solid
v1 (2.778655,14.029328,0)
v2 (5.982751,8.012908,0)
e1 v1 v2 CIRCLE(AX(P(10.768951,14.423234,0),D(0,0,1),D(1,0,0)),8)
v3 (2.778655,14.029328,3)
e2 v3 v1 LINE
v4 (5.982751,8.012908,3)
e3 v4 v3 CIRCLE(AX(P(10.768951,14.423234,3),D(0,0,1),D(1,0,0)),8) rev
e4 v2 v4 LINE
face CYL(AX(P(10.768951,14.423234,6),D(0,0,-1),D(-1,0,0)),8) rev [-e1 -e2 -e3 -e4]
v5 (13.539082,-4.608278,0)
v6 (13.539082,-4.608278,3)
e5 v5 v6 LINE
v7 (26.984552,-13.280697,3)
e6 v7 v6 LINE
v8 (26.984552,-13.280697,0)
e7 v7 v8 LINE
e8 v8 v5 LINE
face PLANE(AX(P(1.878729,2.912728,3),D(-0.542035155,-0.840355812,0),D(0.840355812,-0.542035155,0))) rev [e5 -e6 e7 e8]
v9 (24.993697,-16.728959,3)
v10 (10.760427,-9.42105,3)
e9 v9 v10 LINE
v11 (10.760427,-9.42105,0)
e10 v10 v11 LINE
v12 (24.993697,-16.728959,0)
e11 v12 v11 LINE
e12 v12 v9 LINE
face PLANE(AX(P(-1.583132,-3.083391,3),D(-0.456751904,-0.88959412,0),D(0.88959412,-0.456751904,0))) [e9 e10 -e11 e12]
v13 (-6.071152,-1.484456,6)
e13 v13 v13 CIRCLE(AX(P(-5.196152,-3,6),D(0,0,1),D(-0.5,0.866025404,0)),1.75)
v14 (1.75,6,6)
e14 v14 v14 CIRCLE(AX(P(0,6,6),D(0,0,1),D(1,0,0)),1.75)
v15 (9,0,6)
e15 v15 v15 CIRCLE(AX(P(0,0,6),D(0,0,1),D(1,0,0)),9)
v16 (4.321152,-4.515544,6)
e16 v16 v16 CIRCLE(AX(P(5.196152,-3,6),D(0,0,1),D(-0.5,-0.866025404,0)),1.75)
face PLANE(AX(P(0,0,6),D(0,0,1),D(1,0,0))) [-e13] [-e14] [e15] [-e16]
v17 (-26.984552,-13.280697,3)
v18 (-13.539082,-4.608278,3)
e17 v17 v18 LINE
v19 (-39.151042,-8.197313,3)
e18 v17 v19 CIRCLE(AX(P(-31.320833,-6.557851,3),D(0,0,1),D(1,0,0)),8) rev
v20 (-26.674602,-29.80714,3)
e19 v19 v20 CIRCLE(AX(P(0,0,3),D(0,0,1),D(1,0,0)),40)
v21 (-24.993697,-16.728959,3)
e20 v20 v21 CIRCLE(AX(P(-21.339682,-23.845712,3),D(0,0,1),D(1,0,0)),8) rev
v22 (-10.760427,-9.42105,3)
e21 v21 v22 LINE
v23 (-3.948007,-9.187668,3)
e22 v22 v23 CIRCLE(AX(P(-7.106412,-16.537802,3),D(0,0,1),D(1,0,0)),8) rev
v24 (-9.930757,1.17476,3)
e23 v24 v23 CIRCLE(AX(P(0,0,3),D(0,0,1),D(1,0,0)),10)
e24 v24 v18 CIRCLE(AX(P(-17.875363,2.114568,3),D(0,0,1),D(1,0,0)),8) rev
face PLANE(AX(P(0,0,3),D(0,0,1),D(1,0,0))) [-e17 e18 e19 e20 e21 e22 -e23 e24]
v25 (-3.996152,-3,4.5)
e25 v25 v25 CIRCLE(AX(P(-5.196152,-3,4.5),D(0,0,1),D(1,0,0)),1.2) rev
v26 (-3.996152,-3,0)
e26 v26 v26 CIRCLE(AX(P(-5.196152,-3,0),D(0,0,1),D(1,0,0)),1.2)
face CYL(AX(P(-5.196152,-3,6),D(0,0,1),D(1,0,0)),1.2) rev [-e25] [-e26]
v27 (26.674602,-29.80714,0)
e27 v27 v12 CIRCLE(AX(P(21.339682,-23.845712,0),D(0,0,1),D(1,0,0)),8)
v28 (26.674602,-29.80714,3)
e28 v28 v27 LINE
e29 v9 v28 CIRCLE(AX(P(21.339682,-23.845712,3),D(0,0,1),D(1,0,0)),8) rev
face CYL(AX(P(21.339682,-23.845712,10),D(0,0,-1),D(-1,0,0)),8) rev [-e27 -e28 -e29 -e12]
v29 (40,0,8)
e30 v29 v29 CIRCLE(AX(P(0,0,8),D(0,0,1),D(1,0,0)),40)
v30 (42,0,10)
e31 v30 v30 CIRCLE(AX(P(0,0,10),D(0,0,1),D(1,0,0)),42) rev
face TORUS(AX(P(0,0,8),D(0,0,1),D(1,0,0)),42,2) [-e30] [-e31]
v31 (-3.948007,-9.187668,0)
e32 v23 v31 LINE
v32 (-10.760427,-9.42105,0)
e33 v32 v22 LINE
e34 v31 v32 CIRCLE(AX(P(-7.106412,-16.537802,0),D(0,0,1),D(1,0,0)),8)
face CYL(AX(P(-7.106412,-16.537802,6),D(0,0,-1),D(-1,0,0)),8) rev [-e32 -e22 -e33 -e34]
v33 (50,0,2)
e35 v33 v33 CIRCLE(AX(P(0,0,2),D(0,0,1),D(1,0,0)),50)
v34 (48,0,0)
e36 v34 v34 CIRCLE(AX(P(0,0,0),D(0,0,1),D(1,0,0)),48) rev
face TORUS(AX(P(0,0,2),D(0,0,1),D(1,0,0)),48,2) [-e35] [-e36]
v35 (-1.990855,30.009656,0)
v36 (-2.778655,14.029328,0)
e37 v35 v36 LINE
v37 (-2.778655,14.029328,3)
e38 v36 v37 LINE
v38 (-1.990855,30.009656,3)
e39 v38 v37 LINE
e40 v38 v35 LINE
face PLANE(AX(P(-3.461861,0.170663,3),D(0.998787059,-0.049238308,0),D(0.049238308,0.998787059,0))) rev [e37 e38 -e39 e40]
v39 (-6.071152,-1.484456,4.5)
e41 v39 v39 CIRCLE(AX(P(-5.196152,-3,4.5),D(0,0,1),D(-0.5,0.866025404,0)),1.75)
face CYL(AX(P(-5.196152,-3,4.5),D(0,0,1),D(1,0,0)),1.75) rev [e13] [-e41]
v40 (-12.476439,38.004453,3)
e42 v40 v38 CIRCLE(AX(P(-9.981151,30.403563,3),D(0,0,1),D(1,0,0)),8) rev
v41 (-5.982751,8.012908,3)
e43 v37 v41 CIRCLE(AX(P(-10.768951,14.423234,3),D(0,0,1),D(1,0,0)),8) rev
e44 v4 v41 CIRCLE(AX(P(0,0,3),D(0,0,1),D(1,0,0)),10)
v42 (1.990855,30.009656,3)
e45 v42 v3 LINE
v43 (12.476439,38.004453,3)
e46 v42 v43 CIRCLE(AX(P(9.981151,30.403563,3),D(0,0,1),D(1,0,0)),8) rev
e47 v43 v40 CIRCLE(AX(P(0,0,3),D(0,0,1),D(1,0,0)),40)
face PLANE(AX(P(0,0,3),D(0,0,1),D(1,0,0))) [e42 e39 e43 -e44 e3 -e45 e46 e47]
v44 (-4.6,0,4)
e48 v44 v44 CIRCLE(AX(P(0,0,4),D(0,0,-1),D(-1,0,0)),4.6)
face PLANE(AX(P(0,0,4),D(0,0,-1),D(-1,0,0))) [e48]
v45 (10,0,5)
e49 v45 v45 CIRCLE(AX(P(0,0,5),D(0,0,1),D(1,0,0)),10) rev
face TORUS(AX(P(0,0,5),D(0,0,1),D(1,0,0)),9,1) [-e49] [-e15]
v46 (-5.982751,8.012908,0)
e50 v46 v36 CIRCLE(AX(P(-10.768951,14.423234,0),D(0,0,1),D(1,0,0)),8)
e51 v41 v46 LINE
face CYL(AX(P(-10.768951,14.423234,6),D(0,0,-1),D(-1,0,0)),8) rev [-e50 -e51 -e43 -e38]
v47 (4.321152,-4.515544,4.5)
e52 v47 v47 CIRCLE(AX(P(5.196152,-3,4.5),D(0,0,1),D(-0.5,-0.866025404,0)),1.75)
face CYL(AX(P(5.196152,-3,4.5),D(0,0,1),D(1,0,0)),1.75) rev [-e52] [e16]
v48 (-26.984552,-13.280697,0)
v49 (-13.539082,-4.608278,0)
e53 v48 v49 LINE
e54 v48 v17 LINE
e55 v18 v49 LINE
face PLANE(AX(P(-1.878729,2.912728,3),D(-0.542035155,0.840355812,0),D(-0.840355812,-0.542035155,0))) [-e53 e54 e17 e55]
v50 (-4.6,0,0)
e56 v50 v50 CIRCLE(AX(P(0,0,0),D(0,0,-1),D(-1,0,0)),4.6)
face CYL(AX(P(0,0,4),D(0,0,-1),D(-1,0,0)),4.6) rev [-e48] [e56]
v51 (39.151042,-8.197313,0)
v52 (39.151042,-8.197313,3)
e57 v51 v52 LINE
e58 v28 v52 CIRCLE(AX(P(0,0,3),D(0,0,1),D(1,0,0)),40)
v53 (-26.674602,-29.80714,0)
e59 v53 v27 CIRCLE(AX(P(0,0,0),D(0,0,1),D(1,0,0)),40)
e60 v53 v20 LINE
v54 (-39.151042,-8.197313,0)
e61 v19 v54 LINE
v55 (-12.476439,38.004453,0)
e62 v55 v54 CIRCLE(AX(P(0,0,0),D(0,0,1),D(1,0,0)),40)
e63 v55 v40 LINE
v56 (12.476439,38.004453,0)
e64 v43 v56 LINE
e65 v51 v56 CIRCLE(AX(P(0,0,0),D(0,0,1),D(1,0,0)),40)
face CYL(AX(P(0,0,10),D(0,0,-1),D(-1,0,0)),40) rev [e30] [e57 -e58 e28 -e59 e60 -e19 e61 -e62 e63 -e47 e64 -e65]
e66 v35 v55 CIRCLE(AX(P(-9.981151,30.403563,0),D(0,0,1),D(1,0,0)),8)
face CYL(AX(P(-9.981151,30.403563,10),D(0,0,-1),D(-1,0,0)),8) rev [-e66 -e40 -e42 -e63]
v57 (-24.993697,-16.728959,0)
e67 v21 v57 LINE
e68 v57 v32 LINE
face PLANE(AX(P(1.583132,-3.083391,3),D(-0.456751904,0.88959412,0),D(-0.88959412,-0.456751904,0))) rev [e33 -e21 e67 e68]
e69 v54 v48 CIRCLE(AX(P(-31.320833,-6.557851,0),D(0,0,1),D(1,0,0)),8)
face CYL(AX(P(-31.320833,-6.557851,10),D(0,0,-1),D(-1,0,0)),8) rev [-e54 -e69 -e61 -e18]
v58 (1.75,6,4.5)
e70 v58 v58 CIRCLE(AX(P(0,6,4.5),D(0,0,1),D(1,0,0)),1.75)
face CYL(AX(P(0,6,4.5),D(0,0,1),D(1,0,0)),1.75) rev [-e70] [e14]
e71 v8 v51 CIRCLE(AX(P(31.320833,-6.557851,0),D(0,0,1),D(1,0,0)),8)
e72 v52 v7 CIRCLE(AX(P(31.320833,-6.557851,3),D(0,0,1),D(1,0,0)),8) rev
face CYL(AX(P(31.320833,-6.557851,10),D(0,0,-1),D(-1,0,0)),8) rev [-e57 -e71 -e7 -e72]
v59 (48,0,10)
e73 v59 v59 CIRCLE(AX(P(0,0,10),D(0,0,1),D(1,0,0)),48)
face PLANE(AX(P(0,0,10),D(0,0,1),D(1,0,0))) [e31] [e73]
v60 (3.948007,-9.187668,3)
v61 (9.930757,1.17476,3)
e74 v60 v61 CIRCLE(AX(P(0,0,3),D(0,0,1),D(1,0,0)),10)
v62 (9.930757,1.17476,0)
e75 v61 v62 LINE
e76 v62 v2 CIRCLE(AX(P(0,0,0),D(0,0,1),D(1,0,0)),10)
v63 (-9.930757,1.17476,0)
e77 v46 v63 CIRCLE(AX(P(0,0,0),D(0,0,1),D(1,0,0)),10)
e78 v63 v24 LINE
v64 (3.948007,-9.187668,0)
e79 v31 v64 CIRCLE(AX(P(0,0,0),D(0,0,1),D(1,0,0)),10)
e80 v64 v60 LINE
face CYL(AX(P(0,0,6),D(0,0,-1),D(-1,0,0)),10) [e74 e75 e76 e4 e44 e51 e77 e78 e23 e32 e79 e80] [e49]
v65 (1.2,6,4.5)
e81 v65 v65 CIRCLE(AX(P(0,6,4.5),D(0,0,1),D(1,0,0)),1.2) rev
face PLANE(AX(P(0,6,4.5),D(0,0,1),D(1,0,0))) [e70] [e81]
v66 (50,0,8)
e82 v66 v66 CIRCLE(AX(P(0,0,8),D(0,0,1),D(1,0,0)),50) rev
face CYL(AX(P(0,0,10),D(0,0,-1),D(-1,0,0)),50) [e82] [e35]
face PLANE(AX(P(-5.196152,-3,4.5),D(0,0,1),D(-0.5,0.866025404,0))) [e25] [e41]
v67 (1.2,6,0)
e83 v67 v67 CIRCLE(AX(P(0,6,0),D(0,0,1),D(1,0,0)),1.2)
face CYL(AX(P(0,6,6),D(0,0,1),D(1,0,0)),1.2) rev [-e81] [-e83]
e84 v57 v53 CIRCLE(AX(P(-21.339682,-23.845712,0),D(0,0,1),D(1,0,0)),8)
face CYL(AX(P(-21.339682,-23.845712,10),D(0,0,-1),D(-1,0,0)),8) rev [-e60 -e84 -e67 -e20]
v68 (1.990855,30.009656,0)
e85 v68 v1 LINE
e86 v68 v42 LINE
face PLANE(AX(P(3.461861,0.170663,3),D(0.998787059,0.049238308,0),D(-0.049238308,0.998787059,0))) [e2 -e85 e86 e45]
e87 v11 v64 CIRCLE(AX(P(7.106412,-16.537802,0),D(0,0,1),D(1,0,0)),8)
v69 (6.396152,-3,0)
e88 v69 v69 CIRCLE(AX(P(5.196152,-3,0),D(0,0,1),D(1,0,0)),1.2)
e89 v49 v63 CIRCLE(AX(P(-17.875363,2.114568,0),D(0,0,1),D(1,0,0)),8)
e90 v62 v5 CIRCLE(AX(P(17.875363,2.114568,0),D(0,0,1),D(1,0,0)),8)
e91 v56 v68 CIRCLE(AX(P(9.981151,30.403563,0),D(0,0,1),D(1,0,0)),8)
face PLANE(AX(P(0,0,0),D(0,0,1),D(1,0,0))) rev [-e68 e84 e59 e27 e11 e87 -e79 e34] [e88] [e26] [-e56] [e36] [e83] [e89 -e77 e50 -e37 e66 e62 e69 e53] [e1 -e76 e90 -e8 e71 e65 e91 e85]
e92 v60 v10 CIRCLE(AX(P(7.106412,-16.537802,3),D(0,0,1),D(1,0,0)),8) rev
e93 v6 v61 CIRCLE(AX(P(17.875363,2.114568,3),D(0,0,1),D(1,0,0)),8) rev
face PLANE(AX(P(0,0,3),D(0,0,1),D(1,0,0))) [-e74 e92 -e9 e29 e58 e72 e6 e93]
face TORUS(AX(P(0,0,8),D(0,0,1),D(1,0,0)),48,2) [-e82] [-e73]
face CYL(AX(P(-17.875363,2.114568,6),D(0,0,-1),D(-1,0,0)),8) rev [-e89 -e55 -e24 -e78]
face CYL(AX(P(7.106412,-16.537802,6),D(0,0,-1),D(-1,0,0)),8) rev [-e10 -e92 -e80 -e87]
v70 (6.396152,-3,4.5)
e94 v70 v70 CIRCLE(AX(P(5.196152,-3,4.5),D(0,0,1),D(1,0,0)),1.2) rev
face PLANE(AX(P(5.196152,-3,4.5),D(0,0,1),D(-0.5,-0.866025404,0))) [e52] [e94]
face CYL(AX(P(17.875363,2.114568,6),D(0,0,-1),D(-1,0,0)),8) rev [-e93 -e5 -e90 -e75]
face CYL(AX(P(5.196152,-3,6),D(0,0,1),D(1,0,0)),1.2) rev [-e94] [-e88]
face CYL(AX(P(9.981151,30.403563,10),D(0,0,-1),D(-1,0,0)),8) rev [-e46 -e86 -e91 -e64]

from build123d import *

# Parameters (mm, degrees)
SKETCH1_R                = 50
SKETCH1_R_2              = 40
EXTRUDE_THIN1_DEPTH      = 10
SKETCH2_R                = 10
BOSS_EXTRUDE1_DEPTH      = 6
BOSS_EXTRUDE4_DEPTH      = 3
M2_CLEARANCE_HOLE1_D     = 2.4
M2_CLEARANCE_HOLE1_DEPTH = 10
M2_CLEARANCE_HOLE1_TIP   = 0.721032743
FILLET4_R                = 8
FILLET2_R                = 1
FILLET3_R                = 2
SKETCH7_R                = 4.6
CUT_EXTRUDE1_DEPTH       = 4
SKETCH8_R                = 1.75
CUT_EXTRUDE2_DEPTH       = 1.5
CIRPATTERN1_COUNT        = 3


with BuildPart() as part:
    # Sketch1 → Extrude-Thin1 (new body)
    with BuildSketch(Plane.XY):
        Circle(SKETCH1_R)
        Circle(SKETCH1_R_2, mode=Mode.SUBTRACT)
    extrude(amount=EXTRUDE_THIN1_DEPTH)



with BuildPart() as body_2:
    # Sketch2 → Boss-Extrude1 (new body)
    with BuildSketch(Plane.XY):
        Circle(SKETCH2_R)
    extrude(amount=BOSS_EXTRUDE1_DEPTH)


with BuildPart() as part_1:
    add(part.part)

    add(body_2.part)  # Boss-Extrude4 merges body 2
    # Sketch3 → Boss-Extrude4 (add)
    with BuildSketch(Plane.XY):
        with BuildLine():
            ThreePointArc((-3, 9.539392014), (-1.517576993, 9.884177258), (0, 10))
            Line((0, 10), (0, 40))
            ThreePointArc((0, 40), (-0.75, 39.992968132), (-1.499736305, 39.971875))
            Line((-1.499736305, 39.971875), (-3, 9.539392014))
        make_face()
        with BuildLine():
            Line((0, 40), (0, 10))
            ThreePointArc((0, 10), (1.517576993, 9.884177258), (3, 9.539392014))
            Line((3, 9.539392014), (1.499736305, 39.971875))
            ThreePointArc((1.499736305, 39.971875), (0.75, 39.992968132), (0, 40))
        make_face()
        with BuildLine():
            Line((6.761355821, -7.367772218), (33.866791034, -21.284747239))
            ThreePointArc((33.866791034, -21.284747239), (34.641016151, -20), (35.366527339, -18.687127761))
            Line((35.366527339, -18.687127761), (9.761355821, -2.171619796))
            ThreePointArc((9.761355821, -2.171619796), (8.660254038, -5), (6.761355821, -7.367772218))
        make_face()
        with BuildLine():
            ThreePointArc((-35.366527339, -18.687127761), (-34.641016151, -20), (-33.866791034, -21.284747239))
            Line((-33.866791034, -21.284747239), (-6.761355821, -7.367772218))
            ThreePointArc((-6.761355821, -7.367772218), (-8.660254038, -5), (-9.761355821, -2.171619796))
            Line((-9.761355821, -2.171619796), (-35.366527339, -18.687127761))
        make_face()
    extrude(amount=BOSS_EXTRUDE4_DEPTH)

    # M2 Clearance Hole1
    with Locations(Plane.XY.offset(6)):
        with Locations((0, 6), (-5.196152423, -3), (5.196152423, -3)):
            Hole(M2_CLEARANCE_HOLE1_D / 2, depth=M2_CLEARANCE_HOLE1_DEPTH)
            with Locations((0, 0, -(M2_CLEARANCE_HOLE1_DEPTH + M2_CLEARANCE_HOLE1_TIP / 2))):  # 118° drill point
                Cone(0, M2_CLEARANCE_HOLE1_D / 2, M2_CLEARANCE_HOLE1_TIP, mode=Mode.SUBTRACT)

    # Fillet4
    # the kernel refuses this fillet: 8 mm, written as the material it adds along each edge
    with BuildSketch(Plane(origin=(-3, 9.539392014, 0), x_dir=(-0.8901966603101863, -0.45557645458538654, 0), z_dir=(0, 0, 1)), Plane(origin=(9.761355821, -2.171619796, 0), x_dir=(0.05055754711810484, 0.9987211494853809, 0), z_dir=(0, 0, 1)), Plane(origin=(-6.761355821, -7.367772218, 0), x_dir=(0.8396391131920856, -0.5431446948999943, 0), z_dir=(0, 0, 1))) as fillet4_piece_1:
        with BuildLine():
            CenterArc((4.690930753, -7.886931421), FILLET4_R, 99.644427342, 50.431253784)
            Line((-2.242549971, -3.896086266), (0, 0))
            ThreePointArc((0, 0), (1.675332412, -0.141335724), (3.350664824, 0))
        make_face()
    extrude(amount=3)
    with BuildSketch(Plane(origin=(3, 9.539392014, 0), x_dir=(0.8901966603101863, -0.45557645458538637, 0), z_dir=(0, 0, 1)), Plane(origin=(6.761355821, -7.367772218, 0), x_dir=(-0.8396391131920875, -0.5431446948999916, 0), z_dir=(0, 0, 1)), Plane(origin=(-9.761355821, -2.171619796, 0), x_dir=(-0.05055754711810146, 0.9987211494853812, 0), z_dir=(0, 0, 1))) as fillet4_piece_2:
        with BuildLine():
            CenterArc((4.690930753, 7.886931421), FILLET4_R, 209.924318874, 50.431253784)
            Line((-2.242549971, 3.896086266), (0, 0))
            ThreePointArc((0, 0), (1.675332412, 0.141335724), (3.350664824, 0))
        make_face()
    extrude(amount=3)
    with BuildSketch(Plane(origin=(1.499736305, 39.971875, 0), x_dir=(0.04923830777365754, -0.9987870589107503, 0), z_dir=(0, 0, 1)), Plane(origin=(33.866791034, -21.284747239, 0), x_dir=(-0.8895941198746714, 0.4567519040840537, 0), z_dir=(0, 0, 1)), Plane(origin=(-35.366527339, -18.687127761, 0), x_dir=(0.8403558121010258, 0.542035154826719, 0), z_dir=(0, 0, 1))) as fillet4_piece_3:
        with BuildLine():
            CenterArc((9.974317113, 8), FILLET4_R, 159.003278938, 110.996721062)
            ThreePointArc((2.505509643, 10.866516174), (0.872211792, 5.521000489), (0, 0))
            Line((0, 0), (9.974317113, 0))
        make_face()
    extrude(amount=3)
    with BuildSketch(Plane(origin=(-1.499736305, 39.971875, 0), x_dir=(-0.04923830777365785, -0.9987870589107503, 0), z_dir=(0, 0, 1)), Plane(origin=(35.366527339, -18.687127761, 0), x_dir=(-0.8403558121010118, 0.5420351548267408, 0), z_dir=(0, 0, 1)), Plane(origin=(-33.866791034, -21.284747239, 0), x_dir=(0.8895941198746828, 0.4567519040840315, 0), z_dir=(0, 0, 1))) as fillet4_piece_4:
        with BuildLine():
            CenterArc((9.974317113, -8), FILLET4_R, 90, 110.996721062)
            ThreePointArc((2.505509643, -10.866516174), (0.872211792, -5.521000489), (0, 0))
            Line((0, 0), (9.974317113, 0))
        make_face()
    extrude(amount=3)

    # Fillet2
    fillet2_edges = [part_1.edges().sort_by_distance(p)[0] for p in [
        (-10, 0, 6),
    ]]
    fillet(fillet2_edges, radius=FILLET2_R)

    # Fillet3
    fillet3_edges = [part_1.edges().sort_by_distance(p)[0] for p in [
        (-50, 0, 0),
        (-50, 0, 10),
        (-40, 0, 10),
    ]]
    fillet(fillet3_edges, radius=FILLET3_R)

    # Sketch7 → Cut-Extrude1 (cut)
    with BuildSketch(Plane(origin=(0, 0, 0), x_dir=(-1, 0, 0), z_dir=(0, 0, -1))):
        Circle(SKETCH7_R)
    extrude(amount=-CUT_EXTRUDE1_DEPTH, mode=Mode.SUBTRACT)

    # Sketch8 → Cut-Extrude2 (cut)
    with BuildSketch(Plane.XY.offset(6)):
        with Locations((0, 6)):
            Circle(SKETCH8_R)
    cut_extrude2 = extrude(amount=-CUT_EXTRUDE2_DEPTH, mode=Mode.SUBTRACT)

    # CirPattern1: Cut-Extrude2 ×3 about axis
    cirpattern1_axis = Axis((0, 0, 0), (0, 0, 1))
    for i in range(1, CIRPATTERN1_COUNT):
        add(cut_extrude2.rotate(cirpattern1_axis, i * 360 / CIRPATTERN1_COUNT), mode=Mode.SUBTRACT)


solid = part_1.part
